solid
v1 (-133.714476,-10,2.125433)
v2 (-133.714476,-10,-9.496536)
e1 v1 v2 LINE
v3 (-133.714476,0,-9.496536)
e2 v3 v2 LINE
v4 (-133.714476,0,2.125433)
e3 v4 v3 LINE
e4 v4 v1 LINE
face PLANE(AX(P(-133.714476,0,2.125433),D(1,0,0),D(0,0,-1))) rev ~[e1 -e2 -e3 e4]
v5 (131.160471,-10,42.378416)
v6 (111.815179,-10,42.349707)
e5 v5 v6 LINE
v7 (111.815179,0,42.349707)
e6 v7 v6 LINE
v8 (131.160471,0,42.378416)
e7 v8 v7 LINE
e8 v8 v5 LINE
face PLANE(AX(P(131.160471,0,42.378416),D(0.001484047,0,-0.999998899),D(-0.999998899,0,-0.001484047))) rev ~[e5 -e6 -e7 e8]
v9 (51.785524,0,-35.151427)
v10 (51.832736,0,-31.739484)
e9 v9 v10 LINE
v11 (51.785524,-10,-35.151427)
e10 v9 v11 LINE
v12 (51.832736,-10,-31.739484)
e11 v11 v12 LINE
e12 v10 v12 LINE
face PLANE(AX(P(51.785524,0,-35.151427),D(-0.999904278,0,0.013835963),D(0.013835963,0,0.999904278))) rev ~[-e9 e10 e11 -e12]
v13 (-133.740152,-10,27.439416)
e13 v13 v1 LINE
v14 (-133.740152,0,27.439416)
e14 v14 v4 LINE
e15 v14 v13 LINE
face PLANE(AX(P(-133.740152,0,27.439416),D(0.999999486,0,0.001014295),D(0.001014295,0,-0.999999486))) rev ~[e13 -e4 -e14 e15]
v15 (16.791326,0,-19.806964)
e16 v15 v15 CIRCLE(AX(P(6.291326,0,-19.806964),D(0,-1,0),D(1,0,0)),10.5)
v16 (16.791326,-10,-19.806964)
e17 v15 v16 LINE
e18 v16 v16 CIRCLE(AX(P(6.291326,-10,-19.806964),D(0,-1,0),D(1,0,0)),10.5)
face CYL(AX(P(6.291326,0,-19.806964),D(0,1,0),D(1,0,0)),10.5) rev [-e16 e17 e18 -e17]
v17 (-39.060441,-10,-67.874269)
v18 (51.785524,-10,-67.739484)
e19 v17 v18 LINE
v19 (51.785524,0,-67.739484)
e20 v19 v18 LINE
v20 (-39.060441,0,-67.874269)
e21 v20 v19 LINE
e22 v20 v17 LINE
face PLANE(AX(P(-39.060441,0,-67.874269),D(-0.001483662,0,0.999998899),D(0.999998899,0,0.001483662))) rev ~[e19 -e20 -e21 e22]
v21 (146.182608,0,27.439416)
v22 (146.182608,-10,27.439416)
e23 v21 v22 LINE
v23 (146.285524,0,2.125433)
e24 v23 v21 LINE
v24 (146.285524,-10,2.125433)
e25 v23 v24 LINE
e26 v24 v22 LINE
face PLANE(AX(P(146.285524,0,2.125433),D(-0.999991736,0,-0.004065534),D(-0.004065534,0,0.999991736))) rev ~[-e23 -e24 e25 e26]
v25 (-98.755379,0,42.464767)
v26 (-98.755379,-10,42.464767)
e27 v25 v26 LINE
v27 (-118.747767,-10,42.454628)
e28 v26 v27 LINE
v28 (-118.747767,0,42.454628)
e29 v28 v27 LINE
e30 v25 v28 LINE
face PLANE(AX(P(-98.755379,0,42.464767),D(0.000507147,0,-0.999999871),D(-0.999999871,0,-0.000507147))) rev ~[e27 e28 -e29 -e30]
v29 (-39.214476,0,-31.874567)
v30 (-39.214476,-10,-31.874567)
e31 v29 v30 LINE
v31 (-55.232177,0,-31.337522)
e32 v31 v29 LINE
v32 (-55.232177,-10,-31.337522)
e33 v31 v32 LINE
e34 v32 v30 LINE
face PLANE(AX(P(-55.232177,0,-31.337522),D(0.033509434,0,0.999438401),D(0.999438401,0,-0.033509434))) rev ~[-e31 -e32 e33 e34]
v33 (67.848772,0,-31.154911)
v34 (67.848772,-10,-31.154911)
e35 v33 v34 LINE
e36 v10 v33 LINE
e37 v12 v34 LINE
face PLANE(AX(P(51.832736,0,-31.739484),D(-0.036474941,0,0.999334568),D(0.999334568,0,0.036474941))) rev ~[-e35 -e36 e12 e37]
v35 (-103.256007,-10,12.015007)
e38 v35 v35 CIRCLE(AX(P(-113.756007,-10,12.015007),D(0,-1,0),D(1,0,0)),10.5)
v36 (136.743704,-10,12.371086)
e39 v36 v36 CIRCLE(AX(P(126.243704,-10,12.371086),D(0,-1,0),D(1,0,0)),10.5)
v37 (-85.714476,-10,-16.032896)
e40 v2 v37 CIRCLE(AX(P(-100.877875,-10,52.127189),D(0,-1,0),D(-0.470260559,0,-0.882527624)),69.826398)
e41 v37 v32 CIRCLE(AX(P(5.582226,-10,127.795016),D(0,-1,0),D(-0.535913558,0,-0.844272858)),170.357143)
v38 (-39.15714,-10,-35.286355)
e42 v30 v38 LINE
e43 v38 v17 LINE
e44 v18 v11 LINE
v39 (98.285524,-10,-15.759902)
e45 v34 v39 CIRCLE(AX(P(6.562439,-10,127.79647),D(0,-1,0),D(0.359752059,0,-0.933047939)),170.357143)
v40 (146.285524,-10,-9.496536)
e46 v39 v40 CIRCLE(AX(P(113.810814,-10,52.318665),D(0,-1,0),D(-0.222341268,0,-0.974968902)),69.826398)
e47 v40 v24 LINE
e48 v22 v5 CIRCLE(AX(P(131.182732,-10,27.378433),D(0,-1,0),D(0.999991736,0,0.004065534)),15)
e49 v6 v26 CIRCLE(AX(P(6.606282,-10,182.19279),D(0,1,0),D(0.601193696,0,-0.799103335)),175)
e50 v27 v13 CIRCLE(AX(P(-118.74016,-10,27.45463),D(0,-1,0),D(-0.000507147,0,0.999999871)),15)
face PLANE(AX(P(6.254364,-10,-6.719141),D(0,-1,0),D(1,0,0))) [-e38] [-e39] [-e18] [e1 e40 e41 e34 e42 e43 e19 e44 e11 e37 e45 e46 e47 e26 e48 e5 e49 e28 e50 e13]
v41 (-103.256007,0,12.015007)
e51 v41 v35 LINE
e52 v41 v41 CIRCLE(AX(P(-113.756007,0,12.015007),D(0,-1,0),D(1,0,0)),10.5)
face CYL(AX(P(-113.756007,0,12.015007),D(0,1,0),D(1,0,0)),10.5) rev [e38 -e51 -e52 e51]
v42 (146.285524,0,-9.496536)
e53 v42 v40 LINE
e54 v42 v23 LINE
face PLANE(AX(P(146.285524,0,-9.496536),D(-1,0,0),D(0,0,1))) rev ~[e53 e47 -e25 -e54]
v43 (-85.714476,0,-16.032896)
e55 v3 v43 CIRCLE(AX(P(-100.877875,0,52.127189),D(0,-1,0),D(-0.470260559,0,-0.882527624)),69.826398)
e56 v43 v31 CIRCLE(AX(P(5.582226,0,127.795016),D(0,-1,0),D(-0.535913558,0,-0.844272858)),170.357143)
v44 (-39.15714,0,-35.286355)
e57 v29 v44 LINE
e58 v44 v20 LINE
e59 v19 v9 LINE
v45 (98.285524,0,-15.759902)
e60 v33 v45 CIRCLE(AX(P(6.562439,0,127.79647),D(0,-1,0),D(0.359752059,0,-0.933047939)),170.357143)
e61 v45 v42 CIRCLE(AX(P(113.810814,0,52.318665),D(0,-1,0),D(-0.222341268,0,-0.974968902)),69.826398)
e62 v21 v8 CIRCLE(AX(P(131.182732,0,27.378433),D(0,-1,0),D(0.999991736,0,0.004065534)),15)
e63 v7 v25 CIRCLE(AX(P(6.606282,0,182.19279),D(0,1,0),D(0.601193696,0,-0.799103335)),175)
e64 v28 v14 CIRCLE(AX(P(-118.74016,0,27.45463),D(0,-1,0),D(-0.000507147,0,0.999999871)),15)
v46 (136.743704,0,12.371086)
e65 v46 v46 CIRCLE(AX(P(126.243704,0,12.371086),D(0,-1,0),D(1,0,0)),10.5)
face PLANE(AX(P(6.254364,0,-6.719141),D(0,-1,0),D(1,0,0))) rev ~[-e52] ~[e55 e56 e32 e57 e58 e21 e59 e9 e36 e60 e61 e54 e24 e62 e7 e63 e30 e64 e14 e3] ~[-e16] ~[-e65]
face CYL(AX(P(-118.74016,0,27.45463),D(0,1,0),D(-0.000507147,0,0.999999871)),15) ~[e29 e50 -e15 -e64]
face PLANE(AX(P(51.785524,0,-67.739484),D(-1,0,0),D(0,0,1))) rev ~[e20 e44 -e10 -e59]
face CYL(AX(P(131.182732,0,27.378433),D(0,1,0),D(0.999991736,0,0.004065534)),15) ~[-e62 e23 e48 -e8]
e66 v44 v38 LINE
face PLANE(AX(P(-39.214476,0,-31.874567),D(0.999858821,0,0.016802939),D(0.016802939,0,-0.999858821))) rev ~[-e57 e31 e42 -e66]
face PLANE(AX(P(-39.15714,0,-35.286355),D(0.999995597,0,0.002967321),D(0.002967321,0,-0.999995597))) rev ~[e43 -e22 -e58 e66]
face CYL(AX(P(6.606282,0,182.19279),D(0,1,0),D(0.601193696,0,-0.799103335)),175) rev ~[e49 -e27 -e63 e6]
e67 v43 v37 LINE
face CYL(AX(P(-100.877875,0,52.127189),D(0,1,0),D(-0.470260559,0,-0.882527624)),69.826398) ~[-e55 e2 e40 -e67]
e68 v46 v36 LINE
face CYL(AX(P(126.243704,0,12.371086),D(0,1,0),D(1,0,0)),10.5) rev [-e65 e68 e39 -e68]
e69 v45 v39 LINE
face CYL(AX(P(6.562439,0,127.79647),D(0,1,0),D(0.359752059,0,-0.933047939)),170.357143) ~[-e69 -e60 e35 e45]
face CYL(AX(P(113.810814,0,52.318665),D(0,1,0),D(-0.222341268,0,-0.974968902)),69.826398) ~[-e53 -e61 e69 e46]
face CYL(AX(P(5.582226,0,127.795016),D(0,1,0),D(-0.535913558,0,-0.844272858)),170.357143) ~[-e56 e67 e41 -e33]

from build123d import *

# Parameters (mm, degrees)
F0_R     = 10.5
F1_DEPTH = 10


# Not quite as in the source:
# - ends of sketch curves that miss each other by under 0.0002 mm in the source are joined


with BuildPart() as f1:
    # F0 (on Front) → F1 (new body)
    with BuildSketch(Plane.XZ):
        with BuildLine():
            Line((-98.7553787733, 42.4647671212), (-118.7477670626, 42.4546280338))
            ThreePointArc((-118.7477670626, 42.4546280338), (-129.3548271656, 38.0531599477), (-133.7401521369, 27.4394155453))
            Line((-133.7401521369, 27.4394155453), (-133.71447629, 2.1254326641))
            Line((-133.71447629, 2.1254326641), (-133.71447629, -9.4965361613))
            ThreePointArc((-133.71447629, -9.4965361613), (-110.2994737436, -17.0606664942), (-85.71447629, -16.0328960194))
            ThreePointArc((-85.71447629, -16.0328960194), (-70.8573251513, -24.4500205619), (-55.2321770125, -31.3375216442))
            Line((-55.2321770125, -31.3375216442), (-39.21447629, -31.8745673359))
            Line((-39.21447629, -31.8745673359), (-39.1571401322, -35.2863552357))
            Line((-39.1571401322, -35.2863552357), (-39.0604409149, -67.8742687524))
            Line((-39.0604409149, -67.8742687524), (51.78552371, -67.7394838983))
            Line((51.78552371, -67.7394838983), (51.78552371, -35.1514269125))
            Line((51.78552371, -35.1514269125), (51.8327357464, -31.7394838983))
            Line((51.8327357464, -31.7394838983), (67.8487723641, -31.1549109155))
            ThreePointArc((67.8487723641, -31.1549109155), (83.4534142883, -24.2210753293), (98.28552371, -15.7599019106))
            ThreePointArc((98.28552371, -15.7599019106), (122.8456433746, -16.920758379), (146.28552371, -9.4965361613))
            Line((146.28552371, -9.4965361613), (146.28552371, 2.1254326641))
            Line((146.28552371, 2.1254326641), (146.1826080128, 27.4394155453))
            ThreePointArc((146.1826080128, 27.4394155453), (141.7598617434, 38.0144245463), (131.1604712744, 42.378416024))
            Line((131.1604712744, 42.378416024), (111.8151785594, 42.3497066713))
            ThreePointArc((111.8151785594, 42.3497066713), (6.5106579482, 7.1928164678), (-98.7553787733, 42.4647671212))
        make_face()
        with Locations((6.2913256733, -19.8069641195)):
            Circle(F0_R, mode=Mode.SUBTRACT)
        with Locations((-113.7560071881, 12.015007423)):
            Circle(F0_R, mode=Mode.SUBTRACT)
        with Locations((126.2437040296, 12.371086267)):
            Circle(F0_R, mode=Mode.SUBTRACT)
    extrude(amount=F1_DEPTH)


solid = f1.part
